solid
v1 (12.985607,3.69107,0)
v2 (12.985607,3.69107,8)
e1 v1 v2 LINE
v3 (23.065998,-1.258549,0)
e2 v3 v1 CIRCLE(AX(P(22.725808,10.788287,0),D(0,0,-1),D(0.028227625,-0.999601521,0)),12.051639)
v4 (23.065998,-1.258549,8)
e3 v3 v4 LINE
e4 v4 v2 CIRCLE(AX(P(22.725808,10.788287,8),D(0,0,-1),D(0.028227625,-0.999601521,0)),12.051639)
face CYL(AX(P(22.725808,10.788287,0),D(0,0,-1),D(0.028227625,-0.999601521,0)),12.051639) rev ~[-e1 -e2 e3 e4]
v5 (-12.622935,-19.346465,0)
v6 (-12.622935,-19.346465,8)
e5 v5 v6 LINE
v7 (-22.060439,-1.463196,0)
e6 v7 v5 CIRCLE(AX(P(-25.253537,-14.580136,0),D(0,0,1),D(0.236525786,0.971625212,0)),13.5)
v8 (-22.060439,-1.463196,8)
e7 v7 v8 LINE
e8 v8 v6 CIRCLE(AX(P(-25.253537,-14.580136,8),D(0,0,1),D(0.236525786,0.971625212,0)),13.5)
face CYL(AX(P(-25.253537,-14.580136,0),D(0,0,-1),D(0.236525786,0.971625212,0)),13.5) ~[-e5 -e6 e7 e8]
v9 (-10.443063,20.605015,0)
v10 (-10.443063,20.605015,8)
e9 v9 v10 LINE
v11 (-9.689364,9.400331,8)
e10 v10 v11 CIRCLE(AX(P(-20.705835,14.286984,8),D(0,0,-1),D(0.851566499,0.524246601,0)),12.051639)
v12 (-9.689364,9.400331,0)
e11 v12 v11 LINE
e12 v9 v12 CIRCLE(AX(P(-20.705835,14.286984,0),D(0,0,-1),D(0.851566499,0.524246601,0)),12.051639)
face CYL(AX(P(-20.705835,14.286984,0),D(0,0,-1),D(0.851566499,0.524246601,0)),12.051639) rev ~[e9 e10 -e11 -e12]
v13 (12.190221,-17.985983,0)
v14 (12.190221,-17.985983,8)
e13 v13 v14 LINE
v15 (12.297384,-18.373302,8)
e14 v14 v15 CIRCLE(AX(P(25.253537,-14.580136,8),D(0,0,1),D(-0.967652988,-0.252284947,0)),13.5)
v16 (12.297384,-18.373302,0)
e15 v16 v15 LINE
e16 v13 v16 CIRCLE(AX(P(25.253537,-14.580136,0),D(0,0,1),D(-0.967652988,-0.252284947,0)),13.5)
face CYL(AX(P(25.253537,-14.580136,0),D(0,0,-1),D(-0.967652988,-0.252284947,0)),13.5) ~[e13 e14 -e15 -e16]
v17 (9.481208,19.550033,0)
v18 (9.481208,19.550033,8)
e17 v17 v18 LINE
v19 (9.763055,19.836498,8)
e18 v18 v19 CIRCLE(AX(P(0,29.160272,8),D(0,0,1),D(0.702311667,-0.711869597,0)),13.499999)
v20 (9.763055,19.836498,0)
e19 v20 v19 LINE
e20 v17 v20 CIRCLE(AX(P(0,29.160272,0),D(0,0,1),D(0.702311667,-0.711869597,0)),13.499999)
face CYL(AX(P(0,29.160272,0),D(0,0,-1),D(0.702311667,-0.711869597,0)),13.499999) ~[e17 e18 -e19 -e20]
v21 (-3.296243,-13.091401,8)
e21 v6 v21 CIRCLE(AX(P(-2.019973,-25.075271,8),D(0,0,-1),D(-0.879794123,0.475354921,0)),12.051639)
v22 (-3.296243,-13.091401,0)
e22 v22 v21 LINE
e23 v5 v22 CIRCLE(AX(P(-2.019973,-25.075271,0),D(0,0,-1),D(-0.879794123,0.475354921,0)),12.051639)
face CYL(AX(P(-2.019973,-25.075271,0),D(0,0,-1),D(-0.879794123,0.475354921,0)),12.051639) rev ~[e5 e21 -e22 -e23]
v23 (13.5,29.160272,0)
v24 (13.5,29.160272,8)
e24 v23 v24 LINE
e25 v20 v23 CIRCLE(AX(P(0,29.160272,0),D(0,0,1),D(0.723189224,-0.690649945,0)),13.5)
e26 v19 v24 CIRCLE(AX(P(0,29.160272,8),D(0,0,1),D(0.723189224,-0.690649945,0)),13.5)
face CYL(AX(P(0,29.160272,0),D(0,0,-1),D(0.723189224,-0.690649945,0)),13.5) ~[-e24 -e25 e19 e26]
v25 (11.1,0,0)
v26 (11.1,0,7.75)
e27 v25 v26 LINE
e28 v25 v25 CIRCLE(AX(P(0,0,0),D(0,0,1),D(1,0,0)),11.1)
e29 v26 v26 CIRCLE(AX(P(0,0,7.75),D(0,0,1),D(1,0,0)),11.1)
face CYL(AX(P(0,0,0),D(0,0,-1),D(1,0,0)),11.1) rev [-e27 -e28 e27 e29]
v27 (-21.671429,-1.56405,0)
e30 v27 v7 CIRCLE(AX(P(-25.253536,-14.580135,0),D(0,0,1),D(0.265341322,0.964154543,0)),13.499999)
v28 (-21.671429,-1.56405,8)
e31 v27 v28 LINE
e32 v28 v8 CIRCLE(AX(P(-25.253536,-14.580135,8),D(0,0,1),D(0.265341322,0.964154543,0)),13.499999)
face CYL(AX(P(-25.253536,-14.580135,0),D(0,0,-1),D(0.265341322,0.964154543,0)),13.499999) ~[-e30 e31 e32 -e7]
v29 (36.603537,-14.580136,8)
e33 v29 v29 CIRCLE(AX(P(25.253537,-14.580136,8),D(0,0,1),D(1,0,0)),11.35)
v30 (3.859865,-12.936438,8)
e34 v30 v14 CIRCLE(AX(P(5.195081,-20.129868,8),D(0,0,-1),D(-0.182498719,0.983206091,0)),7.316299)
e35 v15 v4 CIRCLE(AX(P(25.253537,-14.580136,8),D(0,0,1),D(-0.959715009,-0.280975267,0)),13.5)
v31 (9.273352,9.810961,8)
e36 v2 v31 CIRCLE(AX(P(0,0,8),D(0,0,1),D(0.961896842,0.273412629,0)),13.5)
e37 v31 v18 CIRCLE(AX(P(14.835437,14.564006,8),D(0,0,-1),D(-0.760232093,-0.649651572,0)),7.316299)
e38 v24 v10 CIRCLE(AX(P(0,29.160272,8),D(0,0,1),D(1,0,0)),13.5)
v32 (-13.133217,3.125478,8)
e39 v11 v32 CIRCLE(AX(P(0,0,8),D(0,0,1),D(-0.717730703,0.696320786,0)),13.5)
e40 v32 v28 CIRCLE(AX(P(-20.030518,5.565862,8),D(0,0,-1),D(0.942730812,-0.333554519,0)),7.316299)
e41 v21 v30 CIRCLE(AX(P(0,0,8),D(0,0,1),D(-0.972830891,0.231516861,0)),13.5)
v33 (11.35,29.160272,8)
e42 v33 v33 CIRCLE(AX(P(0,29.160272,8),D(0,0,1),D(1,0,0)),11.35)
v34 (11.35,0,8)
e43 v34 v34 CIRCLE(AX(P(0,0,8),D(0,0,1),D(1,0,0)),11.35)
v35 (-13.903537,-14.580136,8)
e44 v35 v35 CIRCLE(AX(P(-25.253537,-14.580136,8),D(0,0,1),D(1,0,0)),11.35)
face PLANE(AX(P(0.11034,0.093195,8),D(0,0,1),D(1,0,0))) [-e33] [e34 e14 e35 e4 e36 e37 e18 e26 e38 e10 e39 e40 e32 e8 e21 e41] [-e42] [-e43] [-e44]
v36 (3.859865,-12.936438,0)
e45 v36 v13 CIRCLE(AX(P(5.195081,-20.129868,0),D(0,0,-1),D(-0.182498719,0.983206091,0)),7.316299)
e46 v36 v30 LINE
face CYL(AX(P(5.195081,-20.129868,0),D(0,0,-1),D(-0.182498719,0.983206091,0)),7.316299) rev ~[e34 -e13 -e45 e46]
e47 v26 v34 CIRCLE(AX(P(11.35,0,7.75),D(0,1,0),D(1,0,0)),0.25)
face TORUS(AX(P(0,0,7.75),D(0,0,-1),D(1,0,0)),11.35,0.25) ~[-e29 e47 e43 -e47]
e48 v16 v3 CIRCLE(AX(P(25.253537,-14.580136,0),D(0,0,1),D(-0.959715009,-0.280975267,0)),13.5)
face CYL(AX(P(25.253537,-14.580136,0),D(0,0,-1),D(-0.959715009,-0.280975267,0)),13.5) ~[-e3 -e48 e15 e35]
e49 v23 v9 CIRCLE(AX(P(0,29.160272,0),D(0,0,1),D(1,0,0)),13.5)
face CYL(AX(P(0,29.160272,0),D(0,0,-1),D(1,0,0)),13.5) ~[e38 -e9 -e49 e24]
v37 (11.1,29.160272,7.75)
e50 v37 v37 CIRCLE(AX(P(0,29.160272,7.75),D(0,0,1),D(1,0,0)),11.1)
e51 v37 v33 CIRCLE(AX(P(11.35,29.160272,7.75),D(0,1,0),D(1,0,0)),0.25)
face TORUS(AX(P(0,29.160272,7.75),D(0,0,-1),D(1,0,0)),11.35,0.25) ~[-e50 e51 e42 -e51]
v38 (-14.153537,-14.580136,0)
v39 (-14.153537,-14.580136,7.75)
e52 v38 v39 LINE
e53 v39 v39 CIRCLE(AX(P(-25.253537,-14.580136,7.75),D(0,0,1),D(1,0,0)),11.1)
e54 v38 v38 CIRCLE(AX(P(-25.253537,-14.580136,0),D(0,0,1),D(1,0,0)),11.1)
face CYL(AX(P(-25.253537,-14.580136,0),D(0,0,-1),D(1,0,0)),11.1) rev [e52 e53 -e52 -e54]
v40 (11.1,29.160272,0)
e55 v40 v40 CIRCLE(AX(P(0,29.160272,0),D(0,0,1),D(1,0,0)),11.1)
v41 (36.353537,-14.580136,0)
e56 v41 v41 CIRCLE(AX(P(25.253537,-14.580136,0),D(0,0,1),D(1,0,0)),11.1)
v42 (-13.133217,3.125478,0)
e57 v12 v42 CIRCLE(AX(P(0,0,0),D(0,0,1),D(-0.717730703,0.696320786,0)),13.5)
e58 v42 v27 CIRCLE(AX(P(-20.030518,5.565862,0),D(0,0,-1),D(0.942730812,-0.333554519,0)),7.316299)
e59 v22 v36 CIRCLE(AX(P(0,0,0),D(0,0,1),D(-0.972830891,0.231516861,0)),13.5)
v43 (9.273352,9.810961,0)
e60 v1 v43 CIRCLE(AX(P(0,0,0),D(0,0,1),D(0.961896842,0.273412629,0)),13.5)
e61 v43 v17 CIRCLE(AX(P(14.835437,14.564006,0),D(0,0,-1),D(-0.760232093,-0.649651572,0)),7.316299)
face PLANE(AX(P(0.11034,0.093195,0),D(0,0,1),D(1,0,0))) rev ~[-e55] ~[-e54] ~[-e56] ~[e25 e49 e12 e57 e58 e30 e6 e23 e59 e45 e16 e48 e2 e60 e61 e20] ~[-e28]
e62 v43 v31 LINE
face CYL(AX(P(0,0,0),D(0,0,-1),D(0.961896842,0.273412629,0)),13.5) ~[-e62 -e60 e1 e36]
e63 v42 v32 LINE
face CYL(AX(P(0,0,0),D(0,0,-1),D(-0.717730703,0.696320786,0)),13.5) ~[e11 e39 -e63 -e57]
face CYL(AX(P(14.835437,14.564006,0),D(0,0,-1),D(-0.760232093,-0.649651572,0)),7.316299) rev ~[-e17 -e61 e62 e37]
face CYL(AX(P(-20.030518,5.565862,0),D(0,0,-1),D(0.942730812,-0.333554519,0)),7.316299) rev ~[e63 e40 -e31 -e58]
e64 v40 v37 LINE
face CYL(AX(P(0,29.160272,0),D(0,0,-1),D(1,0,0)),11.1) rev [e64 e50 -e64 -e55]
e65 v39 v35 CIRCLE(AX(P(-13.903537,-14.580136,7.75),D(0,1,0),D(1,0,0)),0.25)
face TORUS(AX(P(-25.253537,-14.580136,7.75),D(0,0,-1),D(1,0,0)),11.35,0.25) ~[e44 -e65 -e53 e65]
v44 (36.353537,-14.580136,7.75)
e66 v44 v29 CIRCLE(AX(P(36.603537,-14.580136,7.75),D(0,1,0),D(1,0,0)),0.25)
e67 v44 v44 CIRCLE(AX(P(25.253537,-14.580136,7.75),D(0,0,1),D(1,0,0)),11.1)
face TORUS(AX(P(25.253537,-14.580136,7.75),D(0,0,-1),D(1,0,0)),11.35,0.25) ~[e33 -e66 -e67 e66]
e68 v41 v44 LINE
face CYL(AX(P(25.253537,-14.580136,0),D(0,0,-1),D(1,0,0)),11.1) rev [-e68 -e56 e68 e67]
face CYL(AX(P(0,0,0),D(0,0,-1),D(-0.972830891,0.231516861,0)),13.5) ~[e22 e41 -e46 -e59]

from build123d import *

# Parameters (mm, degrees)
F0_R     = 11.1
F1_DEPTH = 8
F2_R     = 0.25


# Not quite as in the source:
# - a feature of the source that left no trace in its solid (it failed there, or was rolled back) is left out


with BuildPart() as f1:
    # F0 (on Top) → F1 (new body)
    with BuildSketch(Plane.XY):
        with BuildLine():
            ThreePointArc((3.859865491, -12.9364383967), (10.8249291944, -8.0666540731), (13.5, 0))
            ThreePointArc((13.5, 0), (13.3707834369, 1.8633706782), (12.9856073653, 3.691070489))
            ThreePointArc((12.9856073653, 3.691070489), (11.5424684167, 7.0015300363), (9.2733515405, 9.8109607688))
            ThreePointArc((9.2733515405, 9.8109607688), (-0.2922686684, 13.4968358894), (-9.6893644933, 9.4003306174))
            ThreePointArc((-9.6893644933, 9.4003306174), (-11.8347370851, 6.4953058532), (-13.1332170315, 3.1254776279))
            ThreePointArc((-13.1332170315, 3.1254776279), (-11.5424684167, -7.0015300363), (-3.296242872, -13.0914011064))
            ThreePointArc((-3.296242872, -13.0914011064), (0.2922686684, -13.4968358894), (3.859865491, -12.9364383967))
        make_face()
        Circle(F0_R, mode=Mode.SUBTRACT)
        with BuildLine():
            ThreePointArc((12.9856073653, 3.691070489), (13.3707834369, 1.8633706782), (13.5, 0))
            ThreePointArc((13.5, 0), (10.8249291944, -8.0666540731), (3.859865491, -12.9364383967))
            ThreePointArc((3.859865491, -12.9364383967), (8.9875948966, -13.8732661585), (12.1902212779, -17.985982946))
            ThreePointArc((12.1902212779, -17.985982946), (13.9354582524, -7.2213929241), (23.0659975588, -1.2585494405))
            ThreePointArc((23.0659975588, -1.2585494405), (17.4140534965, -0.0296267076), (12.9856073653, 3.691070489))
        make_face()
        with BuildLine():
            ThreePointArc((-9.6893644933, 9.4003306174), (-0.2922686684, 13.4968358894), (9.2733515405, 9.8109607688))
            ThreePointArc((9.2733515405, 9.8109607688), (7.5208034785, 14.7201185786), (9.4812075043, 19.5500327774))
            ThreePointArc((9.4812075043, 19.5500327774), (-0.7138194032, 15.679157322), (-10.443062992, 20.6050145698))
            ThreePointArc((-10.443062992, 20.6050145698), (-8.6813692668, 15.0958260647), (-9.6893644933, 9.4003306174))
        make_face()
        with BuildLine():
            ThreePointArc((38.7535366191, -14.580136165), (33.9919066812, -4.2898063036), (23.0659975588, -1.2585494405))
            ThreePointArc((23.0659975588, -1.2585494405), (13.9354582524, -7.2213929241), (12.1902212779, -17.985982946))
            ThreePointArc((12.1902212779, -17.985982946), (12.2464624781, -18.1789066882), (12.297383992, -18.3733022703))
            ThreePointArc((12.297383992, -18.3733022703), (27.1695141155, -27.9434826858), (38.7535366191, -14.580136165))
        make_face()
        with Locations((25.2535366191, -14.580136165)):
            Circle(F0_R, mode=Mode.SUBTRACT)
        with BuildLine():
            ThreePointArc((-12.6229345668, -19.3464651293), (-8.7326842297, -15.066199357), (-3.296242872, -13.0914011064))
            ThreePointArc((-3.296242872, -13.0914011064), (-11.5424684167, -7.0015300363), (-13.1332170315, 3.1254776279))
            ThreePointArc((-13.1332170315, 3.1254776279), (-16.508398375, -0.8468524201), (-21.6714287822, -1.5640498314))
            ThreePointArc((-21.6714287822, -1.5640498314), (-14.5155559943, -6.3980965598), (-11.7535366191, -14.580136165))
            ThreePointArc((-11.7535366191, -14.580136165), (-11.9726645147, -17.0026216958), (-12.6229345668, -19.3464651293))
        make_face()
        with BuildLine():
            ThreePointArc((12.297383992, -18.3733022703), (12.2464624781, -18.1789066882), (12.1902212779, -17.985982946))
            ThreePointArc((12.1902212779, -17.985982946), (12.24236133, -18.1800413854), (12.297383992, -18.3733022703))
        make_face()
        with BuildLine():
            ThreePointArc((9.7630545215, 19.8364980723), (9.620163766, 19.6952009566), (9.4812075043, 19.5500327774))
            ThreePointArc((9.4812075043, 19.5500327774), (9.6231970167, 19.6922166068), (9.7630545215, 19.8364980723))
        make_face()
        with BuildLine():
            ThreePointArc((-10.443062992, 20.6050145698), (-0.7138194032, 15.679157322), (9.4812075043, 19.5500327774))
            ThreePointArc((9.4812075043, 19.5500327774), (9.620163766, 19.6952009566), (9.7630545215, 19.8364980723))
            ThreePointArc((9.7630545215, 19.8364980723), (12.5309863148, 24.1378842547), (13.5, 29.16027233))
            ThreePointArc((13.5, 29.16027233), (-4.5425020422, 41.8730877223), (-10.443062992, 20.6050145698))
        make_face()
        with Locations((0, 29.16027233)):
            Circle(F0_R, mode=Mode.SUBTRACT)
        with BuildLine():
            ThreePointArc((-22.0604385135, -1.463195802), (-37.1929755561, -20.8809137257), (-12.6229345668, -19.3464651293))
            ThreePointArc((-12.6229345668, -19.3464651293), (-11.9726645147, -17.0026216958), (-11.7535366191, -14.580136165))
            ThreePointArc((-11.7535366191, -14.580136165), (-14.5155559943, -6.3980965598), (-21.6714287822, -1.5640498314))
            ThreePointArc((-21.6714287822, -1.5640498314), (-21.8666262441, -1.5162942684), (-22.0604385135, -1.463195802))
        make_face()
        with Locations((-25.2535366191, -14.580136165)):
            Circle(F0_R, mode=Mode.SUBTRACT)
        with BuildLine():
            ThreePointArc((-22.0604385135, -1.463195802), (-21.8666262441, -1.5162942684), (-21.6714287822, -1.5640498314))
            ThreePointArc((-21.6714287822, -1.5640498314), (-21.8655583466, -1.5121752213), (-22.0604385135, -1.463195802))
        make_face()
    extrude(amount=F1_DEPTH)

    # F2
    f2_edges = [f1.edges().sort_by_distance(p)[0] for p in [
        (-11.1, 29.160272, 8),
        (-36.353537, -14.580136, 8),
        (14.153537, -14.580136, 8),
        (-11.1, 0, 8),
    ]]
    fillet(f2_edges, radius=F2_R)


solid = f1.part
